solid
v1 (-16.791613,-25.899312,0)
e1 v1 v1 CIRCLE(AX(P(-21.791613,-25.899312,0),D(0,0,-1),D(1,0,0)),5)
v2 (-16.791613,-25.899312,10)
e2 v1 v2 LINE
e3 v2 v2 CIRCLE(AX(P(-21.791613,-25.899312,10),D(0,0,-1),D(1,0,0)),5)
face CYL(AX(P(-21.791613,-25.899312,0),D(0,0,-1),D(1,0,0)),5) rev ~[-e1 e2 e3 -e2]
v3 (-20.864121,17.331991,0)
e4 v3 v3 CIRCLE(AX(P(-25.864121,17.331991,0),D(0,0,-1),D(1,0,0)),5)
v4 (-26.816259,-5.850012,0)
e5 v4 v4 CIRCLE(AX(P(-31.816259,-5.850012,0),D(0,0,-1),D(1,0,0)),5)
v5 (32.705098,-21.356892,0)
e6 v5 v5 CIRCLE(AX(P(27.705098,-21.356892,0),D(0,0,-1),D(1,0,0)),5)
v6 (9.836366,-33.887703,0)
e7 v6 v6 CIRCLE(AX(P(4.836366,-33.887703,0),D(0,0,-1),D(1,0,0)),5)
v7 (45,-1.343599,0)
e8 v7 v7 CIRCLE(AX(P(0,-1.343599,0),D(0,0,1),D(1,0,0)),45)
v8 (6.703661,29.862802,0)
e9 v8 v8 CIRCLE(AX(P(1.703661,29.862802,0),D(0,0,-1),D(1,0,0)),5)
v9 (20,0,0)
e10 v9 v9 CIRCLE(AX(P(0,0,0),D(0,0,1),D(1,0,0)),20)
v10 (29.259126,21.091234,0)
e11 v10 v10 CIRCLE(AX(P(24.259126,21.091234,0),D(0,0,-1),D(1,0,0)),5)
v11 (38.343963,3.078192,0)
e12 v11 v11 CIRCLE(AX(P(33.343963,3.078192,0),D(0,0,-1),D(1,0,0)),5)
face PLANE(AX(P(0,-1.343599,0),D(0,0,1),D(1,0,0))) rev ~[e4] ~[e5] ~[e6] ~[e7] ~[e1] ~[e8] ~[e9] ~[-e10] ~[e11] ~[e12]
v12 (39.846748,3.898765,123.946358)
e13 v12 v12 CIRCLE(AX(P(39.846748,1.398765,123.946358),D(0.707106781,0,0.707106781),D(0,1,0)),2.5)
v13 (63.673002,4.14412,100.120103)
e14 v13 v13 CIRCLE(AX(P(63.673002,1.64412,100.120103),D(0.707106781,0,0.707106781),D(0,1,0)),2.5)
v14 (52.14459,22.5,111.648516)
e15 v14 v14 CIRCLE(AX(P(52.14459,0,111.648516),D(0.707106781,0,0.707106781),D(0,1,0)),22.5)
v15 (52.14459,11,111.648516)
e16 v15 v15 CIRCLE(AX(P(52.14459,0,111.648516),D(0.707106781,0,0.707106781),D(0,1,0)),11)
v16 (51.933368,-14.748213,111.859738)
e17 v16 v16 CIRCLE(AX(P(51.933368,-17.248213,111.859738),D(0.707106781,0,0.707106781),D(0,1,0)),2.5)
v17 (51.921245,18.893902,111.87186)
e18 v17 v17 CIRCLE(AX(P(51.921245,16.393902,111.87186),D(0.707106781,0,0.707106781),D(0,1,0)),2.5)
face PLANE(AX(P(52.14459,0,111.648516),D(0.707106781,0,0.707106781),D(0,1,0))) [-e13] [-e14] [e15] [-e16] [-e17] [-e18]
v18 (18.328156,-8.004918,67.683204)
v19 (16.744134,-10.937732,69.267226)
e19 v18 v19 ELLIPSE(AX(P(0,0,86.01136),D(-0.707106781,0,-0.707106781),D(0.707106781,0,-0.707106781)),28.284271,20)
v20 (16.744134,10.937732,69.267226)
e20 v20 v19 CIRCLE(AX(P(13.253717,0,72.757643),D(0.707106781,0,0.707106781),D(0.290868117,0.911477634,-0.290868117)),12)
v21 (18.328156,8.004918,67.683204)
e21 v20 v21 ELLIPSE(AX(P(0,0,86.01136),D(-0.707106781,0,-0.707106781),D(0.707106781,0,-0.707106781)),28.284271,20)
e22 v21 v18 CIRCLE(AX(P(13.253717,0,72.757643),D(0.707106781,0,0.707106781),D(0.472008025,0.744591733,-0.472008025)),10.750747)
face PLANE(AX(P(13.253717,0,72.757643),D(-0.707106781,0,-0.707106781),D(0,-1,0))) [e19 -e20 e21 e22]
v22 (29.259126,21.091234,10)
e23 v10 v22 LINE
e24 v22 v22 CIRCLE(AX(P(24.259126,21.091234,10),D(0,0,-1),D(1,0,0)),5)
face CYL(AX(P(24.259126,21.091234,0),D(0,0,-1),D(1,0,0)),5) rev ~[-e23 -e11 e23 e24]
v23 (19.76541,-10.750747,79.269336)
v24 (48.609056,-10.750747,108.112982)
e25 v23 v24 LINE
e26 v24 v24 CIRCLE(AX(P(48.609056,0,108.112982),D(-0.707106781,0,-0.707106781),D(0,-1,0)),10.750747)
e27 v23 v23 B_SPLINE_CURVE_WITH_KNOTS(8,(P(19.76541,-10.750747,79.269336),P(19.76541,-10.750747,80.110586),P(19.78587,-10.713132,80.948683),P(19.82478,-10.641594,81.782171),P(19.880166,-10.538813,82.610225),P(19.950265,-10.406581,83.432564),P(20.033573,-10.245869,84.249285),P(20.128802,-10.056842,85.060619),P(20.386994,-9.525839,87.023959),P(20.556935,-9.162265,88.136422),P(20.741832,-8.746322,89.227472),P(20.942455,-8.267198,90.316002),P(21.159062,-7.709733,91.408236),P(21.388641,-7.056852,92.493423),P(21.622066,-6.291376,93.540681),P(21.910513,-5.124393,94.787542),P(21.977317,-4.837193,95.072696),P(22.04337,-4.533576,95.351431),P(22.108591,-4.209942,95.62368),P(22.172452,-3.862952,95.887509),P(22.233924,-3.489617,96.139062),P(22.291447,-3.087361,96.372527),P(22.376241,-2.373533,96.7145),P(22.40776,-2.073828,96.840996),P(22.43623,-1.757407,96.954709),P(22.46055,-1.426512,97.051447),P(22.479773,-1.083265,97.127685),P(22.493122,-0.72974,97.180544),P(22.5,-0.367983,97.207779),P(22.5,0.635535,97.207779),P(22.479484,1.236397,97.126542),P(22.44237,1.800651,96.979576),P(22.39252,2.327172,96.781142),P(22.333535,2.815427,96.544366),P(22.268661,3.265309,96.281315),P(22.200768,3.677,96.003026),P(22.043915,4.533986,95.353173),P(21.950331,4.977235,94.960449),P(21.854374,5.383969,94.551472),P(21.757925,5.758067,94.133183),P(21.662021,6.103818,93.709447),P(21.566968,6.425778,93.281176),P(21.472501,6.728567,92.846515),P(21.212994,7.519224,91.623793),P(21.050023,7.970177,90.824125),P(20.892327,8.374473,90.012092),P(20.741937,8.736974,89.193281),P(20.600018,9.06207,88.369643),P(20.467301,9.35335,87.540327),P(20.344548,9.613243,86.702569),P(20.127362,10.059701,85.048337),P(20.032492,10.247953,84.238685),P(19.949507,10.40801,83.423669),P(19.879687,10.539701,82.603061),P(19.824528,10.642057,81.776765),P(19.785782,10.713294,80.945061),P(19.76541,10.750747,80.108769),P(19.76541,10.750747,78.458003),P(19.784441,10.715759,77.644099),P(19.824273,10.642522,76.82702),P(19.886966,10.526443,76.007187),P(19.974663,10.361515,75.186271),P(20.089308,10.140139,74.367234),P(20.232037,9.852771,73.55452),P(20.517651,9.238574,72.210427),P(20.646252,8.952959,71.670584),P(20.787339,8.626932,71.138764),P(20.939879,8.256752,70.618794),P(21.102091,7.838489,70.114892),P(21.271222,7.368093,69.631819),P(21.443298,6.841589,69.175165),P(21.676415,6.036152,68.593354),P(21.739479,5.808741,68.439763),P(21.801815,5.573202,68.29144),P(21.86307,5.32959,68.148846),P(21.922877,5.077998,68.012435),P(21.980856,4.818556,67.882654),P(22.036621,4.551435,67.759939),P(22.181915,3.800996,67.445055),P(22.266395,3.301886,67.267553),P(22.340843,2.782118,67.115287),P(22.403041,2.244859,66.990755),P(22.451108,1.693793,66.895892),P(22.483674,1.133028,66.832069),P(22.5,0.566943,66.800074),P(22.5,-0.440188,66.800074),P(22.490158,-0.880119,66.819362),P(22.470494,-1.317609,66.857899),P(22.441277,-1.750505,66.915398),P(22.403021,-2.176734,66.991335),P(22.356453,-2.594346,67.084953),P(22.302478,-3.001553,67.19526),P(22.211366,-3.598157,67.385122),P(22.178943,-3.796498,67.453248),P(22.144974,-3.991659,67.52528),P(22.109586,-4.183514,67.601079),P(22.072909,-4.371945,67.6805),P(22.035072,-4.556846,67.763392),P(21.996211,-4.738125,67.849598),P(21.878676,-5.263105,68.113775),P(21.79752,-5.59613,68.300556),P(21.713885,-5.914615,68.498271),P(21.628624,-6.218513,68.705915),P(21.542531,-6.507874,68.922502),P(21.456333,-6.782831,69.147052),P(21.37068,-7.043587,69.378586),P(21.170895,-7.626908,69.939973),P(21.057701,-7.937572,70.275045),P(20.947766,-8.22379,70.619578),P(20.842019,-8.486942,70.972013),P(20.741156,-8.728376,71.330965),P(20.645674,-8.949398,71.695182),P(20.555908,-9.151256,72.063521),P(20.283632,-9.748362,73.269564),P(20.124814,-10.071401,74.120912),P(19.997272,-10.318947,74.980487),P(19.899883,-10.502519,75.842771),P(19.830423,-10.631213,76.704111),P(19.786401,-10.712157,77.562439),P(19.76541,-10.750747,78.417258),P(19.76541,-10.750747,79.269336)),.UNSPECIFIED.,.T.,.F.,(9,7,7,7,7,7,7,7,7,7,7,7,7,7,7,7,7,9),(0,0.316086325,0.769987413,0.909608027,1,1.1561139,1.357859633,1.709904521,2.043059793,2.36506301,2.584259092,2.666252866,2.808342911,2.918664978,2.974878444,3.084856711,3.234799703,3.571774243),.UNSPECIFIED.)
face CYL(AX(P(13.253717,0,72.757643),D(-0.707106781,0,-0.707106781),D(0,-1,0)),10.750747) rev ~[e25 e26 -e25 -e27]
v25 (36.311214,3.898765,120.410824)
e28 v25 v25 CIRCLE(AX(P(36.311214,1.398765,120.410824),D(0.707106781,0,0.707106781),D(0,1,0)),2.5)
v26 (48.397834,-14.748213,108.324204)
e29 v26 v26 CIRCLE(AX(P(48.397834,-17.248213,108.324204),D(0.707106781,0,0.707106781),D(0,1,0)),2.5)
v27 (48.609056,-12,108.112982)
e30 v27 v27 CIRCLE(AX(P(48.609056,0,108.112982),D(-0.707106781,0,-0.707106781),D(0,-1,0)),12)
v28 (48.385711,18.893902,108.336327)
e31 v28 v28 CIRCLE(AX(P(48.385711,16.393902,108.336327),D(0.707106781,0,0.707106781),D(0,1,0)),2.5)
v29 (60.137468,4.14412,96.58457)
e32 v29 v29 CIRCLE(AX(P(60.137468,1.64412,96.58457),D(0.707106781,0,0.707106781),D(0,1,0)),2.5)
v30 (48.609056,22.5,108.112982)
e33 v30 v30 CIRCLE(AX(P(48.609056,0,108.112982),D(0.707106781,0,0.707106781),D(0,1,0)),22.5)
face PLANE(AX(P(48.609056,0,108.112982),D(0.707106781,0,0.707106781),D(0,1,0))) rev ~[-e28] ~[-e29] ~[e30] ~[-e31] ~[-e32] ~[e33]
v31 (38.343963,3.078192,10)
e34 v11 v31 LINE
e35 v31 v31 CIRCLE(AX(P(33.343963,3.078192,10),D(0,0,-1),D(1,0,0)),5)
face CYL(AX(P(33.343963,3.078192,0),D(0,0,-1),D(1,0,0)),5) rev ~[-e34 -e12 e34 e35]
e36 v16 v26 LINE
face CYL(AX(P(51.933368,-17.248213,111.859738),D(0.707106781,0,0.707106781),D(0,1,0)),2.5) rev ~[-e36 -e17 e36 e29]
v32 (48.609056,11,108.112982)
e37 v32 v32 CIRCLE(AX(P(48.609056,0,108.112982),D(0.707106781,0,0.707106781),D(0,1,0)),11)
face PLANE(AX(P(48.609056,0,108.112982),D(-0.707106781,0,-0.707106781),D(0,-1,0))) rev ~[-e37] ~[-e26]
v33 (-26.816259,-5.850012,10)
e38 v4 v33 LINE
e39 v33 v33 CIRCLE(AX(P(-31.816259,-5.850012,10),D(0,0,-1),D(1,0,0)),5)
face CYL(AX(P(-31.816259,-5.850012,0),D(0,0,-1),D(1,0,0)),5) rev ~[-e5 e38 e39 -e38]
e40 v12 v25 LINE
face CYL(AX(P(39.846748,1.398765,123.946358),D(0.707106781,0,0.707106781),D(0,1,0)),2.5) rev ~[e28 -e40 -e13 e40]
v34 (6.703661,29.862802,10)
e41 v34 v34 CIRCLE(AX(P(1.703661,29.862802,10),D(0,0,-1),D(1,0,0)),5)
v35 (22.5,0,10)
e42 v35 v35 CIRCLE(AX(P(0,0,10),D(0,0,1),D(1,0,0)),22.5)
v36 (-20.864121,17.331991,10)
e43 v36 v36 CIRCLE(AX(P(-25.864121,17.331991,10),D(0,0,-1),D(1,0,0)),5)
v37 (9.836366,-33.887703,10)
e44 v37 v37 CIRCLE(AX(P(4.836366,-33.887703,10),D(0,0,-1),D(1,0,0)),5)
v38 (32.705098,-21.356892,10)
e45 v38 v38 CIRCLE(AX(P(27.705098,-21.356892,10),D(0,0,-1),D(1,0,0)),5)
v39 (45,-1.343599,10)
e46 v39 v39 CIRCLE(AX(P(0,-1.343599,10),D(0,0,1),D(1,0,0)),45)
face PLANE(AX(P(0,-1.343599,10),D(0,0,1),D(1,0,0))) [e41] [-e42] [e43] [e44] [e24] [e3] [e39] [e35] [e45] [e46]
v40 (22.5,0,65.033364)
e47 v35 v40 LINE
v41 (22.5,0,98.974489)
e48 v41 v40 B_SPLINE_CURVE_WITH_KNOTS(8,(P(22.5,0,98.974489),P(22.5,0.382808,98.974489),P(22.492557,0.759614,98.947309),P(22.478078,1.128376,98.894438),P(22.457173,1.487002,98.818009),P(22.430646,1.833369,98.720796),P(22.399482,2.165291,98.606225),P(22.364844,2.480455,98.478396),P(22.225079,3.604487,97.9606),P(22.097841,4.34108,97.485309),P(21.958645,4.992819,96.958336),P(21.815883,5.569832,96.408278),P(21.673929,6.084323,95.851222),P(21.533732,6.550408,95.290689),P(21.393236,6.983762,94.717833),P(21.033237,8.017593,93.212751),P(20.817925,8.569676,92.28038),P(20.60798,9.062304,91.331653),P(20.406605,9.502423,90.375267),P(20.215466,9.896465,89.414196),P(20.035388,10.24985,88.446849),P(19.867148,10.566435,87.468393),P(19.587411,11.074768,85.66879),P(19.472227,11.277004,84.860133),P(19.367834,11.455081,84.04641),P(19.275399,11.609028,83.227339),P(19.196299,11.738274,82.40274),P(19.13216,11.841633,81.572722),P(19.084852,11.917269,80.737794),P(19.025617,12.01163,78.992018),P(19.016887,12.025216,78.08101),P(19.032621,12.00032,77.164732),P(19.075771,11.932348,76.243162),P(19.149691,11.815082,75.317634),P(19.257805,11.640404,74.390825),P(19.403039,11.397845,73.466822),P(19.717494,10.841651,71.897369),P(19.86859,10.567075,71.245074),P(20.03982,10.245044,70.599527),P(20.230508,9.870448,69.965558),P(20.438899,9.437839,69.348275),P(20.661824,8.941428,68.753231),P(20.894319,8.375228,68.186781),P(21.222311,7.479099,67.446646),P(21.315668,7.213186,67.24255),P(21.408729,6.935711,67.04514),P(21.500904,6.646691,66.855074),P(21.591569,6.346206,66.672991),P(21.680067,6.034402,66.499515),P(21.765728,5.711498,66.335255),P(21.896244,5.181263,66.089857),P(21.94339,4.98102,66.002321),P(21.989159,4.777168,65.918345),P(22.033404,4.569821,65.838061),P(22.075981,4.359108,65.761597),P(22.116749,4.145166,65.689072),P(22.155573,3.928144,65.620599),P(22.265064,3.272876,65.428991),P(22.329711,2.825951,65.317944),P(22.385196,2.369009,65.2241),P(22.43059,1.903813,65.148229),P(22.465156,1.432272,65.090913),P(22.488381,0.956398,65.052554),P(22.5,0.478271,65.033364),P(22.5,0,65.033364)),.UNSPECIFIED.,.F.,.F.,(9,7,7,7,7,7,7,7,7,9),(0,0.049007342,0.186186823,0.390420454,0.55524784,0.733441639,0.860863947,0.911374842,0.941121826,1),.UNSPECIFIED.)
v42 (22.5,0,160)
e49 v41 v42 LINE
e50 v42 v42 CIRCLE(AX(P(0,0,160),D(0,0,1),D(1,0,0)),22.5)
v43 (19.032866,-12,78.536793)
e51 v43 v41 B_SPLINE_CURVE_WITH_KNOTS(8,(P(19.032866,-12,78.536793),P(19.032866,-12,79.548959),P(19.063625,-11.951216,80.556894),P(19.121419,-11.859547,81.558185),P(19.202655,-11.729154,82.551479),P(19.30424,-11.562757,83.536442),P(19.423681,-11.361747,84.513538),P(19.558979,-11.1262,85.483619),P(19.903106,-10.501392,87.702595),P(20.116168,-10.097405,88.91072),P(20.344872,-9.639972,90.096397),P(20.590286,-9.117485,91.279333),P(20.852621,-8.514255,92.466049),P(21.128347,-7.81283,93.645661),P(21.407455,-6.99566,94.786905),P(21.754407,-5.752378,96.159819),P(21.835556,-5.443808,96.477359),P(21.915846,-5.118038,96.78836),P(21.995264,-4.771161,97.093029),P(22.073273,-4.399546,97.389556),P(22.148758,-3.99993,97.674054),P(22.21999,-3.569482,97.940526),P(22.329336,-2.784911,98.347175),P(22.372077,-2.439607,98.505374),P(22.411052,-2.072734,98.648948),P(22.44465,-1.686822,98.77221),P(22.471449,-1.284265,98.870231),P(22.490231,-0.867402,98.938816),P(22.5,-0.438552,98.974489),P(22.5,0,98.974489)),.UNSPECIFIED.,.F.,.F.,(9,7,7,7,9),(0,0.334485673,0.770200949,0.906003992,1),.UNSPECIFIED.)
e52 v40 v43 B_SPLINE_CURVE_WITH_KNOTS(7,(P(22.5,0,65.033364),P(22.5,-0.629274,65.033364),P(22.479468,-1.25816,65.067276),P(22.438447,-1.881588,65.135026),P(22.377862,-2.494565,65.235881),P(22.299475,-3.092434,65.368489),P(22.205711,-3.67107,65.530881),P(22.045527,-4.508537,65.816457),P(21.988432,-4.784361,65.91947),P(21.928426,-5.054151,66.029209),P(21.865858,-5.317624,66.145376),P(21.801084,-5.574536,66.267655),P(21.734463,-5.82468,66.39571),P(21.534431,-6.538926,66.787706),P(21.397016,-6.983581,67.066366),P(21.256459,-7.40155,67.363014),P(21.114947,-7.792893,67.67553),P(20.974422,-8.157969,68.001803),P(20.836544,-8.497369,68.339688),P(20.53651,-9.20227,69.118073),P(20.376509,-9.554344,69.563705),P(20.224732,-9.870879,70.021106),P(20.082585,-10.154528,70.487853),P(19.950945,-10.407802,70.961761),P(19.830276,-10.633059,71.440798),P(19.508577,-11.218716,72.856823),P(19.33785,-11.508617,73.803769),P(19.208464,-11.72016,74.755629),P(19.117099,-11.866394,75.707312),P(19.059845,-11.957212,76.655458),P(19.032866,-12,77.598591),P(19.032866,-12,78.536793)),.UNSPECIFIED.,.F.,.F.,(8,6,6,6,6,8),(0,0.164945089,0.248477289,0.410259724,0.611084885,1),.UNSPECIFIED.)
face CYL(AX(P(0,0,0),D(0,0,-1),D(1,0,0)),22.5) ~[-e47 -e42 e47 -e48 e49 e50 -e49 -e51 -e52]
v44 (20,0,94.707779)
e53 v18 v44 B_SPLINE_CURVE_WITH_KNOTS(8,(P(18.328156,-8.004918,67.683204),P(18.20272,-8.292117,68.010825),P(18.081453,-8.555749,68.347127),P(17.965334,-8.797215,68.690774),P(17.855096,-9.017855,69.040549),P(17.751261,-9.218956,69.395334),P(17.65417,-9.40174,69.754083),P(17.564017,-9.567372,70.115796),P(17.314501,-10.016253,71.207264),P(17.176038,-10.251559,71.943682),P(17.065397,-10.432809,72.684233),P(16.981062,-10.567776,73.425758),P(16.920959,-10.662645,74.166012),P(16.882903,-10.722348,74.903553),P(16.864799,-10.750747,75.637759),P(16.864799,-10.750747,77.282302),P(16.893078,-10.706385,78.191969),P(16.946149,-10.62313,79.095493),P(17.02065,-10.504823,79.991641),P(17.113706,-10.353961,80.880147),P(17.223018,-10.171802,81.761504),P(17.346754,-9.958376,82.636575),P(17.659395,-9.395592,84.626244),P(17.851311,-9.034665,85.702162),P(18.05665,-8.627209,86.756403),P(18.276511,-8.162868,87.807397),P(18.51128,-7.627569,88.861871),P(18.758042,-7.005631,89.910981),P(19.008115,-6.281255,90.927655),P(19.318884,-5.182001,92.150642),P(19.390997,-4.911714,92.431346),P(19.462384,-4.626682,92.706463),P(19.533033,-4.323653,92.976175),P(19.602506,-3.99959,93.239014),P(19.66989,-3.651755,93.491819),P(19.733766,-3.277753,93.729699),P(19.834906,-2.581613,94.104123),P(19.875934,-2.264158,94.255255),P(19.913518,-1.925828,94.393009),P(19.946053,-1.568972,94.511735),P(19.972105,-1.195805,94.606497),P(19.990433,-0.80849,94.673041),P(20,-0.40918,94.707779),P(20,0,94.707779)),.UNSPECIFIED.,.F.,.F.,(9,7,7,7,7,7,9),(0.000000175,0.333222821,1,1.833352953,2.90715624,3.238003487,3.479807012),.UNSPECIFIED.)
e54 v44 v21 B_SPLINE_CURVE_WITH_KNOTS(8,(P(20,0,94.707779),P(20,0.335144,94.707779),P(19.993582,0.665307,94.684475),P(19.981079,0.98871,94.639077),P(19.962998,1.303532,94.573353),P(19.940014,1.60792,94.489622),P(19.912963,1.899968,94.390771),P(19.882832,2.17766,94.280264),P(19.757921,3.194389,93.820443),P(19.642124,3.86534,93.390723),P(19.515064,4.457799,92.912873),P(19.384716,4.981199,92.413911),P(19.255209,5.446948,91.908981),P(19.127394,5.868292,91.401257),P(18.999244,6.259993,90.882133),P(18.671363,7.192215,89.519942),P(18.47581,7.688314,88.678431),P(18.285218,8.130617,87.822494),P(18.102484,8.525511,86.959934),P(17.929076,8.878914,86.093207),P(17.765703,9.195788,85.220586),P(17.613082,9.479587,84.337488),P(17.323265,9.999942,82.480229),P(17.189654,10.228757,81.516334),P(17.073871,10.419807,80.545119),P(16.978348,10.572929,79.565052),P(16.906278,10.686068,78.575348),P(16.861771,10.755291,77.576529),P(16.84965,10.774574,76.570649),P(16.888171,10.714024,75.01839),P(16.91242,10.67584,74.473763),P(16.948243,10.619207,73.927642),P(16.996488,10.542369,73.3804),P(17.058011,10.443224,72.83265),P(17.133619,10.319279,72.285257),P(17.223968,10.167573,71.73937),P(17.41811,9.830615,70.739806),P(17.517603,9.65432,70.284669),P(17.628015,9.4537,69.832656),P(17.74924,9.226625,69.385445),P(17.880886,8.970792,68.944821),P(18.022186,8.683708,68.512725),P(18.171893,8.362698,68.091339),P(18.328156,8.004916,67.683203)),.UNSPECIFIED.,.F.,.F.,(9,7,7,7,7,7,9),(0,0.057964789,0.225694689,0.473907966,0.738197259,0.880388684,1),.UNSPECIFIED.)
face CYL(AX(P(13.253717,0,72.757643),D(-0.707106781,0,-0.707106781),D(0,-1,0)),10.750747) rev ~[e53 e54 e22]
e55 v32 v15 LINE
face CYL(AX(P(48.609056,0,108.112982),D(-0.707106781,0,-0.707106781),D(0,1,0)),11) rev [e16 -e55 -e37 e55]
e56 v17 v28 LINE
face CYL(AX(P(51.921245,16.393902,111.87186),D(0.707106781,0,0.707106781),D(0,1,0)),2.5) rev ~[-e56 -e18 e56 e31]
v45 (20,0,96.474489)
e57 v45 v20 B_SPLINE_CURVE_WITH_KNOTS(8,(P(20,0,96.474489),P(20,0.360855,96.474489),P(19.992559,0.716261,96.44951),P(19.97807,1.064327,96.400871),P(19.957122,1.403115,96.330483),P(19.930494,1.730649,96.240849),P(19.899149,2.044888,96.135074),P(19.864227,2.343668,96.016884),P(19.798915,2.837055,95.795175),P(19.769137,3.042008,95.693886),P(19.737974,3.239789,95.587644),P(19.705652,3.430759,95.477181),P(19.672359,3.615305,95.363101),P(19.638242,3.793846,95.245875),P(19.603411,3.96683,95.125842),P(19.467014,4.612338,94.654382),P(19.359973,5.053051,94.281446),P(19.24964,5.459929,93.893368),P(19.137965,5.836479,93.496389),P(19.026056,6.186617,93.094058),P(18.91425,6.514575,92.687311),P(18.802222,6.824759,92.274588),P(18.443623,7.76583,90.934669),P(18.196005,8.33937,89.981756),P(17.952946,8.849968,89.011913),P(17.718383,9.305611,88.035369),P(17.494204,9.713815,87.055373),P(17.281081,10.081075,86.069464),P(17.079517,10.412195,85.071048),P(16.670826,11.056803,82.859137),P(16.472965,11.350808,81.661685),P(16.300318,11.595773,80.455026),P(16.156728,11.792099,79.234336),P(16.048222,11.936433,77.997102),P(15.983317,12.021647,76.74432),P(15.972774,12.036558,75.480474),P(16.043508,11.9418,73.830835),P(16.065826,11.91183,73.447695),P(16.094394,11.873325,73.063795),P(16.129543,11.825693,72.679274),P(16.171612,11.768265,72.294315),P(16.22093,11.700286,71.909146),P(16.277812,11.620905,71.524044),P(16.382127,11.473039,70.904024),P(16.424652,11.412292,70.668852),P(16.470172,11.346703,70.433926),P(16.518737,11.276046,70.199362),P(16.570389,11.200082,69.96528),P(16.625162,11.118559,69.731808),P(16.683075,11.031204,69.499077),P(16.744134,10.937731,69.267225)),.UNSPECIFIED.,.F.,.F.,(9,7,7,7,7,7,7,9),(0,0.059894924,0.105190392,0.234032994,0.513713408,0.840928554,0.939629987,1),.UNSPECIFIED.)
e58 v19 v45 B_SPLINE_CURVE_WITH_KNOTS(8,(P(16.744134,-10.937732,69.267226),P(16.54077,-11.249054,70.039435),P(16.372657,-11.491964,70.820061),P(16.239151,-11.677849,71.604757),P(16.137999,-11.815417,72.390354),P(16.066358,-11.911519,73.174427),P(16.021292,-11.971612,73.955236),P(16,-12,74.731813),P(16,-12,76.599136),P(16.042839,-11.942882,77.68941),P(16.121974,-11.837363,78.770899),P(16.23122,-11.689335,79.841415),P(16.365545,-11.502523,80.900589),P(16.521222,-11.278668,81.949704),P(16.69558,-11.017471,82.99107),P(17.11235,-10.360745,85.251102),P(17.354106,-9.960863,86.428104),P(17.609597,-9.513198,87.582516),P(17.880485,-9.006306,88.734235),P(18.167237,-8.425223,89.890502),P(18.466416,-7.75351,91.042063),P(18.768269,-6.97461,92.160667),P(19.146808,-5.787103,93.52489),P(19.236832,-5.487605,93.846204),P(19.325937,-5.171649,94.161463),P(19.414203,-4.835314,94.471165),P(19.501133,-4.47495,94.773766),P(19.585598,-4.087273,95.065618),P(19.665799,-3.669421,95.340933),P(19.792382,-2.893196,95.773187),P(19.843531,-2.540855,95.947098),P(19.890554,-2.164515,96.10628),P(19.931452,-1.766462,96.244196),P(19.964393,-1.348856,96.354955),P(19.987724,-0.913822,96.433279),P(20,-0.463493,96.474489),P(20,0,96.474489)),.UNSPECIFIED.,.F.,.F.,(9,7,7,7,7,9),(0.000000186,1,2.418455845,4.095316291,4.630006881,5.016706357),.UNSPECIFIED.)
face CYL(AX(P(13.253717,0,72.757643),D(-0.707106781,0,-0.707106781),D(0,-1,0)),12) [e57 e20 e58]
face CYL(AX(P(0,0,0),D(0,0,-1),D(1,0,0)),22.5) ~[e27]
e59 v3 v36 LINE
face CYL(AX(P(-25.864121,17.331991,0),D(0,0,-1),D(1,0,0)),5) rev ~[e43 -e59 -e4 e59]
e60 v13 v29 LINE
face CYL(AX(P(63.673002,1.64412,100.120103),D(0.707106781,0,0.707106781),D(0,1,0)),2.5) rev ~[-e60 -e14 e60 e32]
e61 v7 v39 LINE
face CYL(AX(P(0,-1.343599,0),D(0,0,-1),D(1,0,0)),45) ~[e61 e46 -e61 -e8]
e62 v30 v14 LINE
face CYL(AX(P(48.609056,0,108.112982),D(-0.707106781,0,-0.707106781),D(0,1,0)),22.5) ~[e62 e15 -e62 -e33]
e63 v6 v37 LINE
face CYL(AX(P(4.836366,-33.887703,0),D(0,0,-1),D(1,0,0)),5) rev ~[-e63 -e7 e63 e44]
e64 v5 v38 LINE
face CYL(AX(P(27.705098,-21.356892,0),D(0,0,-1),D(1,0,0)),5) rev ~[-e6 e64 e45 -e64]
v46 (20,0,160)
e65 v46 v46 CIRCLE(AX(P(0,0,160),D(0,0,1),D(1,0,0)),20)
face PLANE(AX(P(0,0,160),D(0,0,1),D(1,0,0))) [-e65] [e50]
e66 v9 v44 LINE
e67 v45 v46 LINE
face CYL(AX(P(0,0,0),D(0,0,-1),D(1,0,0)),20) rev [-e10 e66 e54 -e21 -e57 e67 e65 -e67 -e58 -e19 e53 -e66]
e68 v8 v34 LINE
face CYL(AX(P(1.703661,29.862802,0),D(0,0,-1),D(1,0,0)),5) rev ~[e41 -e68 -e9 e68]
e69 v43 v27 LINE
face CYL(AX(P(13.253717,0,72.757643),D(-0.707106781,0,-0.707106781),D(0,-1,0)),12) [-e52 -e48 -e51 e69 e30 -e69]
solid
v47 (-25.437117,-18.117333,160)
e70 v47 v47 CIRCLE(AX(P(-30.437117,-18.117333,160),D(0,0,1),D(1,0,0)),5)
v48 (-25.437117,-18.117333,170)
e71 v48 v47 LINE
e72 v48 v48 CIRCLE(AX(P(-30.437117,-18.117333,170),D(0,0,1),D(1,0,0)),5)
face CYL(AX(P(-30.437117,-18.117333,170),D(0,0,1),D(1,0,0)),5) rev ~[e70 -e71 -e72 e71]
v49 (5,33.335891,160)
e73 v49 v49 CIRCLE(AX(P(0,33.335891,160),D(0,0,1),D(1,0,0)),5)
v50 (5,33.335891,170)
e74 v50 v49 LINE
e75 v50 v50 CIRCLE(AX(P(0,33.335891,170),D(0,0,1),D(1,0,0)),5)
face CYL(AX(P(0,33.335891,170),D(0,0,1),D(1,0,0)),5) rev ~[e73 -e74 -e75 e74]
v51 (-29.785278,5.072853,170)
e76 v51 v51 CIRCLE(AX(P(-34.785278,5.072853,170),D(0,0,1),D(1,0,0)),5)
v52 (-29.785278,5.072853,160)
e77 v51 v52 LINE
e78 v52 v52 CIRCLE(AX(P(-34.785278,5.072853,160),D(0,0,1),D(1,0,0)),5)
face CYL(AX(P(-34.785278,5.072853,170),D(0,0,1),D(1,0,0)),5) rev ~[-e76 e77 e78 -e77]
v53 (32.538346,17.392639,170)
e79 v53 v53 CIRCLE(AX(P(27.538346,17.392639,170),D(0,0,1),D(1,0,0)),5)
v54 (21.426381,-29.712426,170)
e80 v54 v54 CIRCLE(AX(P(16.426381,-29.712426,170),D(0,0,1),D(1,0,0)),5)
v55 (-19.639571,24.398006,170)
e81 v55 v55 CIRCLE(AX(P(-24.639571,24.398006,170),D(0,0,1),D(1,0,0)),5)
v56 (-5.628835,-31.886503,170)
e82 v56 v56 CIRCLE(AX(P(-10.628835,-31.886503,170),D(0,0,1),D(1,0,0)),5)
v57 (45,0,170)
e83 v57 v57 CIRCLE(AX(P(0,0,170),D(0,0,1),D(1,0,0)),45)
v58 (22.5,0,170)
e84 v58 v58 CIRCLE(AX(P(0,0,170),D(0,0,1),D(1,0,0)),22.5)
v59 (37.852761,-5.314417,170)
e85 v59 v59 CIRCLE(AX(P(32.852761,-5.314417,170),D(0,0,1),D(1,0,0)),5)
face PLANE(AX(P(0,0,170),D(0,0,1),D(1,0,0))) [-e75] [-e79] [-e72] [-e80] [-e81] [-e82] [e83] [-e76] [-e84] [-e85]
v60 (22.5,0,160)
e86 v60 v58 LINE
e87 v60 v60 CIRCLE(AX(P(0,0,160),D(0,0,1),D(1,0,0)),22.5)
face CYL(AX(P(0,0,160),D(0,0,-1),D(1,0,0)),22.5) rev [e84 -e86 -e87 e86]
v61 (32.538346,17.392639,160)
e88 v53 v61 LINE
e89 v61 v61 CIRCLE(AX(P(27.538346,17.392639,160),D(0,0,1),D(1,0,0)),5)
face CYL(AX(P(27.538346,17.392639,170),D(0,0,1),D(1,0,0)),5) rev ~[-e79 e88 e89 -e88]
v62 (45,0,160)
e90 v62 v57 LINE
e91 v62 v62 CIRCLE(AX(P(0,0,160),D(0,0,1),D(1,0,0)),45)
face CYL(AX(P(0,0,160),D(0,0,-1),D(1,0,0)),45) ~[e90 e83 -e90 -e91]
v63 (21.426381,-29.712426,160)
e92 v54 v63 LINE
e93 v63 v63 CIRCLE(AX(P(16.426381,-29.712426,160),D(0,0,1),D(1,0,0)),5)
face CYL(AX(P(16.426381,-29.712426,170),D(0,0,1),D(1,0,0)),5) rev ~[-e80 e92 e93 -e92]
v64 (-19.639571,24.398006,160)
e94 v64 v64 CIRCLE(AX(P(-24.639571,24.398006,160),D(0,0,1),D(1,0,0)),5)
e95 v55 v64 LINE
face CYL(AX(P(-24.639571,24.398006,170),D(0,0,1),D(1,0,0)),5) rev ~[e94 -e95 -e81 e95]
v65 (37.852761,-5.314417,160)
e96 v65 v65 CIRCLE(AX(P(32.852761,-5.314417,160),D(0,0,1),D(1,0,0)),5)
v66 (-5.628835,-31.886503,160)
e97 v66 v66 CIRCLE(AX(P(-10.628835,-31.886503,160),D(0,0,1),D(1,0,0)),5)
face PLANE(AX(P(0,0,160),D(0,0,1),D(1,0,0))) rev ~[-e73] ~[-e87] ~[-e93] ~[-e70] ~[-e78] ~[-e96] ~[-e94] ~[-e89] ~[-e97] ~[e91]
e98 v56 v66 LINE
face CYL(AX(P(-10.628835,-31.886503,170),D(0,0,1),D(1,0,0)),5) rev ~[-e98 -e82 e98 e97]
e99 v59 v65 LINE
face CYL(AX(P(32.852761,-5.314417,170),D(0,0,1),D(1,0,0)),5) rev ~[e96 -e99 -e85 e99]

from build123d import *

# Parameters (mm, degrees)
F0_R      = 22.5
F0_R_2    = 20
F1_DEPTH  = 160
F3_R      = 45
F3_R_2    = 22.5
F4_DEPTH  = 10
F2_R      = 45
F2_R_2    = 22.5
F5_DEPTH  = 10
F8_R      = 12
F8_R_2    = 10.7507474001
F9_DEPTH  = 50
F10_R     = 22.5
F10_R_2   = 11
F11_DEPTH = 5
F12_R     = 5
F13_DEPTH = 10
F14_R     = 2.5
F15_DEPTH = 5
F16_R     = 5
F17_DEPTH = 10


# Not quite as in the source:
# - a feature names something its author has since deleted; it is built from what else it names


with BuildPart() as f1:
    # F0 (on Top) → F1 (new body)
    with BuildSketch(Plane.XY):
        Circle(F0_R)
        Circle(F0_R_2, mode=Mode.SUBTRACT)
    extrude(amount=F1_DEPTH)

    # F2 (on Top) → F5 (join)
    with BuildSketch(Plane.XY):
        with Locations((0, -1.3435994042)):
            Circle(F2_R)
        Circle(F2_R_2, mode=Mode.SUBTRACT)
    extrude(amount=F5_DEPTH)

    # F8 (on face) → F9 (join)
    with BuildSketch(Plane(origin=(43.0056799411, 0, 43.0056799411), x_dir=(0, -1, 0), z_dir=(-0.7071067812, 0, -0.7071067812))):
        with Locations((0, 42.075629902)):
            Circle(F8_R)
        with Locations((0, 42.075629902)):
            Circle(F8_R_2, mode=Mode.SUBTRACT)
    extrude(amount=-F9_DEPTH)

    # F10 (on face) → F11 (join)
    with BuildSketch(Plane(origin=(78.3610190004, 0, 78.3610190004), x_dir=(0, 1, 0), z_dir=(0.7071067812, 0, 0.7071067812))):
        with Locations((0, 42.075629902)):
            Circle(F10_R)
        with Locations((0, 42.075629902)):
            Circle(F10_R_2, mode=Mode.SUBTRACT)
    extrude(amount=F11_DEPTH)

    # F14 (on face) → F15 (cut)
    with BuildSketch(Plane(origin=(81.8965529064, 0, 81.8965529064), x_dir=(0, 1, 0), z_dir=(0.7071067812, 0, 0.7071067812))):
        with Locations((16.3939017802, 42.3914864659)):
            Circle(F14_R)
        with Locations((-17.2482132912, 42.37434268)):
            Circle(F14_R)
        with Locations((1.3987645507, 59.4674050808)):
            Circle(F14_R)
        with Locations((1.6441198532, 25.7719922811)):
            Circle(F14_R)
    extrude(amount=-F15_DEPTH, mode=Mode.SUBTRACT)

    # F16 (on face) → F17 (cut)
    with BuildSketch(Plane(origin=(0, 0, 0), x_dir=(1, 0, 0), z_dir=(0, 0, -1))):
        with Locations((1.7036608187, -29.8628024757)):
            Circle(F16_R)
        with Locations((24.2591258138, -21.0912339389)):
            Circle(F16_R)
        with Locations((33.343963325, -3.0781920068)):
            Circle(F16_R)
        with Locations((27.705097571, 21.3568918407)):
            Circle(F16_R)
        with Locations((4.8363660462, 33.8877029717)):
            Circle(F16_R)
        with Locations((-21.7916127294, 25.8993115276)):
            Circle(F16_R)
        with Locations((-31.8162590265, 5.8500124142)):
            Circle(F16_R)
        with Locations((-25.8641205728, -17.3319913447)):
            Circle(F16_R)
    extrude(amount=-F17_DEPTH, mode=Mode.SUBTRACT)


with BuildPart() as f4:
    # F3 (on face) → F4 (new body)
    with BuildSketch(Plane.XY.offset(160)):
        Circle(F3_R)
        Circle(F3_R_2, mode=Mode.SUBTRACT)
    extrude(amount=F4_DEPTH)

    # F12 (on face) → F13 (cut)
    with BuildSketch(Plane.XY.offset(170)):
        with Locations((-30.4371174425, -18.117332831)):
            Circle(F12_R)
        with Locations((-34.7852781415, 5.0728525966)):
            Circle(F12_R)
        with Locations((-10.6288352981, -31.8865031004)):
            Circle(F12_R)
        with Locations((16.4263807237, -29.7124255449)):
            Circle(F12_R)
        with Locations((32.8527614474, -5.3144171834)):
            Circle(F12_R)
        with Locations((27.5383461267, 17.3926390707)):
            Circle(F12_R)
        with Locations((0, 33.3358906209)):
            Circle(F12_R)
        with Locations((-24.6395710856, 24.3980064988)):
            Circle(F12_R)
    extrude(amount=-F13_DEPTH, mode=Mode.SUBTRACT)


solid = Compound([f1.part, f4.part])
